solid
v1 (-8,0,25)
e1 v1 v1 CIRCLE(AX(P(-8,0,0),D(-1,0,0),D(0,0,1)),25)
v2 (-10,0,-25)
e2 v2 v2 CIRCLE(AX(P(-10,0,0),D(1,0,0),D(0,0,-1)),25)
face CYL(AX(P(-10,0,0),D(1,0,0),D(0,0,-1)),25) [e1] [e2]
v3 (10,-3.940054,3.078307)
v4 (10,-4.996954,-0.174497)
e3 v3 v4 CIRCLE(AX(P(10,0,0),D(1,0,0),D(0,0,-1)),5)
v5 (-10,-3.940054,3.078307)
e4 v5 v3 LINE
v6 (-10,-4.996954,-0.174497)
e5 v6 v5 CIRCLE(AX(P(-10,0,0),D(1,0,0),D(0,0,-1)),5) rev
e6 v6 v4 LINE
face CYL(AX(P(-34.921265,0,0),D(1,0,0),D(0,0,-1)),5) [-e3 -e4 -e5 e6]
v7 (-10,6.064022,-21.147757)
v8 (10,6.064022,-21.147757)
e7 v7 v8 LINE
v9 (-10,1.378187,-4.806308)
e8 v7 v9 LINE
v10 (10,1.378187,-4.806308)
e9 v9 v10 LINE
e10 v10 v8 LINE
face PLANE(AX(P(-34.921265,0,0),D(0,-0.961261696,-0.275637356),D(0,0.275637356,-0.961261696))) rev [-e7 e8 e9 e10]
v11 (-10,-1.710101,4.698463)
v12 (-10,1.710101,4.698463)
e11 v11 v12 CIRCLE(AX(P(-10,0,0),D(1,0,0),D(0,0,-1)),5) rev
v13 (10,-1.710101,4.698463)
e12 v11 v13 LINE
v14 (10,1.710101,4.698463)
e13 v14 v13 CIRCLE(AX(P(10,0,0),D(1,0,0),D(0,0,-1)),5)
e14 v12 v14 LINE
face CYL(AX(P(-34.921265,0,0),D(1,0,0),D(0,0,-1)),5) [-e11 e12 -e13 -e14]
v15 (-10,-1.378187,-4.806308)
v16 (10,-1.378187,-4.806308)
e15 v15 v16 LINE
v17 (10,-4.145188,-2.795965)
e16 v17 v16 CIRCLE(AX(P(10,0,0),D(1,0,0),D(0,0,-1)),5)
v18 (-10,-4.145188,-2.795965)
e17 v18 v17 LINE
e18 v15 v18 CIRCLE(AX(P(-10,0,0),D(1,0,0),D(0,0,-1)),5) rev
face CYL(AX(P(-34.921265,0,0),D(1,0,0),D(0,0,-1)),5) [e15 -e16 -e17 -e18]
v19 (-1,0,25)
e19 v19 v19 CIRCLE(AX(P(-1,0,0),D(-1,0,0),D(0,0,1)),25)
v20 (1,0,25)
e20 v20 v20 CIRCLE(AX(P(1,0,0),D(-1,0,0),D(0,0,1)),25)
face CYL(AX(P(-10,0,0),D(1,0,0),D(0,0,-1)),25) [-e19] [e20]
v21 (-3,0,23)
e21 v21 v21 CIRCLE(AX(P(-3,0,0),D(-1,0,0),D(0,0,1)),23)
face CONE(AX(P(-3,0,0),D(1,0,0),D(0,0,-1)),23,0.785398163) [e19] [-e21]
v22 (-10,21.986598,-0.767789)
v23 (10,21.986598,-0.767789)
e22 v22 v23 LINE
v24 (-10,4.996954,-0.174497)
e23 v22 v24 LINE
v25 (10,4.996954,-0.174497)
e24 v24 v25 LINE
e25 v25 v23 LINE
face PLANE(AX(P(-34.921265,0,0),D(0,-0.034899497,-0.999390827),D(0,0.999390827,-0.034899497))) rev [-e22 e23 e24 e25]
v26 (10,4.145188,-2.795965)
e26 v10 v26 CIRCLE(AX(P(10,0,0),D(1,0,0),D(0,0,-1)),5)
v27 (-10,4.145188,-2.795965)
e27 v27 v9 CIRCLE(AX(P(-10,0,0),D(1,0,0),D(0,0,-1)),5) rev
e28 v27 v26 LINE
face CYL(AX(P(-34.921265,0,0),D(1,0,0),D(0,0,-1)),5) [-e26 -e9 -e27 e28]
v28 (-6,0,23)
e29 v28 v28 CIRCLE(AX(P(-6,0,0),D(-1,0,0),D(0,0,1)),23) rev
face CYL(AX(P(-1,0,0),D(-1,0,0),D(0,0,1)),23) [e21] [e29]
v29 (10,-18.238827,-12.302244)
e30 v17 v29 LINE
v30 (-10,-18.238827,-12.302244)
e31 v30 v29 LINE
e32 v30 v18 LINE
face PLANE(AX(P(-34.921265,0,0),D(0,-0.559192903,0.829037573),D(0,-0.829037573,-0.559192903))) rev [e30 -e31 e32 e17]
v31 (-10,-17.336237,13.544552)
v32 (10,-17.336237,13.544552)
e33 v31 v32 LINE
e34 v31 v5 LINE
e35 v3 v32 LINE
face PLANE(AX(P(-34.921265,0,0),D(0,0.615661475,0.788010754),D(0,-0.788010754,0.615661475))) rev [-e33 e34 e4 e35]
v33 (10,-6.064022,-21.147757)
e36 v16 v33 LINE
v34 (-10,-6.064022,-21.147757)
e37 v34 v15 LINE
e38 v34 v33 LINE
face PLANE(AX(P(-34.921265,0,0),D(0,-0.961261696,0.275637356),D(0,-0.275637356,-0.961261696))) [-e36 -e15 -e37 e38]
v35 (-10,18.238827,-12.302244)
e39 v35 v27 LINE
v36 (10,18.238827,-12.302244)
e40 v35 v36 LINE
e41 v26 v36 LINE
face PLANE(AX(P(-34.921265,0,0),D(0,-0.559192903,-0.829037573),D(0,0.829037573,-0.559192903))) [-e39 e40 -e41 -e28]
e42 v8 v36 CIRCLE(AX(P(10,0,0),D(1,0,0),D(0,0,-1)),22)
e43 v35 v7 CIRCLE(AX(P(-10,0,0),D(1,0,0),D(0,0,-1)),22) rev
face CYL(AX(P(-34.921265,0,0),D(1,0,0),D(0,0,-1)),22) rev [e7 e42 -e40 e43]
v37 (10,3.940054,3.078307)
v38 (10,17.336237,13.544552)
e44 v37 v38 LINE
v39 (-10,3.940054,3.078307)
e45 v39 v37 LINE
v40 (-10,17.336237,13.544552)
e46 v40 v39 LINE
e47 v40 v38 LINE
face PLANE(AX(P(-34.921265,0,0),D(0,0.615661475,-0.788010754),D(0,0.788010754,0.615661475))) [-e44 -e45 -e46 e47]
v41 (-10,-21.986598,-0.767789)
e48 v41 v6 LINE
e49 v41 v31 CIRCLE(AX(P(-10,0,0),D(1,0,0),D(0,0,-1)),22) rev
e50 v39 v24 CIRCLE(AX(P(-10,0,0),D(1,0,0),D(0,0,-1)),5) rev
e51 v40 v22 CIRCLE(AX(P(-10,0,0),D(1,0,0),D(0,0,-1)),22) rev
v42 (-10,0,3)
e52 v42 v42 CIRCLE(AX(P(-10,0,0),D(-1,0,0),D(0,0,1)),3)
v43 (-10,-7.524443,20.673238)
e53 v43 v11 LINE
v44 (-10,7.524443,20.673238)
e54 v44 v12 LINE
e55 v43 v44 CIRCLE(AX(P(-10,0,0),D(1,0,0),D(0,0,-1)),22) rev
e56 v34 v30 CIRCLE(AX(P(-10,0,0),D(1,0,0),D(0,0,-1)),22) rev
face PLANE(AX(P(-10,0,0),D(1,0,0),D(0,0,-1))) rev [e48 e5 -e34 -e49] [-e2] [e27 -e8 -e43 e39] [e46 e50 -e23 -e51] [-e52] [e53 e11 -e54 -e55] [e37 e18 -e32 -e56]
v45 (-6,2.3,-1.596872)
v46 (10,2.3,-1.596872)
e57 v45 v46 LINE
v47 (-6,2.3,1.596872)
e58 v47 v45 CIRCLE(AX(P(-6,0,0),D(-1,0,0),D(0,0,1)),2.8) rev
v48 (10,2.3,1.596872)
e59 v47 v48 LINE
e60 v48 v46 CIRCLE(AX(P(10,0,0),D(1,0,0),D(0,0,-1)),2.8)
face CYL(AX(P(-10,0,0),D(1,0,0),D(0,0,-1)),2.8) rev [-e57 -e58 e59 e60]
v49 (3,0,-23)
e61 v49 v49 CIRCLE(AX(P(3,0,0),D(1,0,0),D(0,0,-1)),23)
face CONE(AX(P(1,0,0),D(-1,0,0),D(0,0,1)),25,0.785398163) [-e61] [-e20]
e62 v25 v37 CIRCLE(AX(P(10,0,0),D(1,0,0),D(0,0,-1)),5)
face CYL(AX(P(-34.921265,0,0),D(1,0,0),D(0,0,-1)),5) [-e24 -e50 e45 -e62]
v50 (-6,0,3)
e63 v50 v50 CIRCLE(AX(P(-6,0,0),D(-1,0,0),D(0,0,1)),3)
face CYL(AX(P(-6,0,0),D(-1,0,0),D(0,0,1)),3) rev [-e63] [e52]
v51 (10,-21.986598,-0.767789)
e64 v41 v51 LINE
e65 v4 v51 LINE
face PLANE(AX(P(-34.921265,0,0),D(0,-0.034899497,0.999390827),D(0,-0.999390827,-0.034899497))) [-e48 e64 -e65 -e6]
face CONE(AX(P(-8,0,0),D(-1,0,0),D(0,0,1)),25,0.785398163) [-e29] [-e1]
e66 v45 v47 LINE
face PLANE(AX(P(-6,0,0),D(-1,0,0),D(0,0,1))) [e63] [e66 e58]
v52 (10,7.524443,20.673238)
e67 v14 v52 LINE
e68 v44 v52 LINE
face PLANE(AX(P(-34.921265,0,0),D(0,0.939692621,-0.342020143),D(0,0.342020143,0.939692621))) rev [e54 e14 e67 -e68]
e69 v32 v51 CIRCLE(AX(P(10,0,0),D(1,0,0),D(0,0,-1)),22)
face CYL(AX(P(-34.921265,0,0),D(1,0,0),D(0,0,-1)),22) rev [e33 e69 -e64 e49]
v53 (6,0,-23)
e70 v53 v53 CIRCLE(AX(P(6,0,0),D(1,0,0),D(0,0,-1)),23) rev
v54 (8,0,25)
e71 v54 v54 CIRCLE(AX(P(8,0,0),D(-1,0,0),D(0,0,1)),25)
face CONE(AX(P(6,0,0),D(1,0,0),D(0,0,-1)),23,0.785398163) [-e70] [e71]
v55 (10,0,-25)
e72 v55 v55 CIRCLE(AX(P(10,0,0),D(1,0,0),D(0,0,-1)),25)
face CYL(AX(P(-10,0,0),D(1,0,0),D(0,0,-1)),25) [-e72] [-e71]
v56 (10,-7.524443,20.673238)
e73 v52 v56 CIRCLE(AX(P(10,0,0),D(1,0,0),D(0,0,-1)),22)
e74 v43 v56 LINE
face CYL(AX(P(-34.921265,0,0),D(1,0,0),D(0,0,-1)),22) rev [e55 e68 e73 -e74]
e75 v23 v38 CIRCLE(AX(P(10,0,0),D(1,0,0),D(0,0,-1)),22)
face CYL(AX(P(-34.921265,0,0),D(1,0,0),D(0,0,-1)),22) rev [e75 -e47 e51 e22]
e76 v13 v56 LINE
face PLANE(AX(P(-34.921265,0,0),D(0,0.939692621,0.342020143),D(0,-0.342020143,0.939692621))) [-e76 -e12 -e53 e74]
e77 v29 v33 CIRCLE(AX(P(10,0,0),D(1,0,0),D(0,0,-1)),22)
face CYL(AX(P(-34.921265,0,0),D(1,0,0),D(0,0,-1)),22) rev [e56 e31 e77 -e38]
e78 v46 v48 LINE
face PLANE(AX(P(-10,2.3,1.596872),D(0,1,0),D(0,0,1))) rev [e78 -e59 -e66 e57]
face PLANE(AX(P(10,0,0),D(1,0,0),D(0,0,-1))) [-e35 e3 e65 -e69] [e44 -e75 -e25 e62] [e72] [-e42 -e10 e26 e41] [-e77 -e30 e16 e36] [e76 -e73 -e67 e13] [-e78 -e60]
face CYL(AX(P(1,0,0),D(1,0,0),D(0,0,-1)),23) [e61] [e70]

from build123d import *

# Parameters (mm, degrees)
BASE_DEPTH          = 10
BASE_DEPTH_BACK     = 10
ESQUISSE1_R         = 25
ESQUISSE2_R         = 25
ESQUISSE2_R_2       = 23
VIDE_GORGE_DEPTH    = 7
VIDE_JANTE_DEPTH    = 20
ESQUISSE6_R         = 3
VIDE_BLOC_AXE_DEPTH = 4
CHAN_SIZE           = 2


with BuildPart() as part:
    # Esquisse1 → BASE (new, two sides: drawn at the far end of the back side and taken through both)
    with BuildSketch(Plane(origin=(0, 0, 0), x_dir=(0, 0, -1), z_dir=(1, 0, 0)).offset(-BASE_DEPTH_BACK)):
        Circle(ESQUISSE1_R)
        with BuildLine():
            Line((-1.596871942, 2.3), (1.596871942, 2.3))
            ThreePointArc((1.596871942, 2.3), (0, -2.8), (-1.596871942, 2.3))
        make_face(mode=Mode.SUBTRACT)
    extrude(amount=BASE_DEPTH + BASE_DEPTH_BACK)

    # Esquisse2 → VIDE GORGE (cut)
    with BuildSketch(Plane.ZY.offset(8)):
        with Locations(Location((0, 0, 0), (0, 0, 180))):
            Circle(ESQUISSE2_R)
        Circle(ESQUISSE2_R_2, mode=Mode.SUBTRACT)
    vide_gorge = extrude(amount=-VIDE_GORGE_DEPTH, mode=Mode.SUBTRACT)

    # SYM GORGE: VIDE GORGE across plane
    add(vide_gorge.mirror(Plane(origin=(0, 0, 0), x_dir=(0, 0, 1), z_dir=(1, 0, 0))), mode=Mode.SUBTRACT)

    # Esquisse4 → VIDE JANTE (cut)
    with BuildSketch(Plane(origin=(10, 0, 0), x_dir=(0, 0, -1), z_dir=(1, 0, 0))):
        with BuildLine():
            Line((-22, 0), (-5, 0))
            ThreePointArc((-5, 0), (-4.924038765, 0.868240888), (-4.698463104, 1.710100717))
            Line((-4.698463104, 1.710100717), (-20.673237657, 7.524443153))
            ThreePointArc((-20.673237657, 7.524443153), (-21.665770566, 3.820259909), (-22, 0))
        make_face()
        with BuildLine():
            ThreePointArc((-4.698463104, -1.710100717), (-4.924038765, -0.868240888), (-5, 0))
            Line((-5, 0), (-22, 0))
            ThreePointArc((-22, 0), (-21.665770566, -3.820259909), (-20.673237657, -7.524443153))
            Line((-20.673237657, -7.524443153), (-4.698463104, -1.710100717))
        make_face()
        with BuildLine():
            Line((-13.544552457, 17.336236579), (-3.078307377, 3.940053768))
            ThreePointArc((-3.078307377, 3.940053768), (-1.545084972, 4.755282581), (0.174497484, 4.996954135))
            Line((0.174497484, 4.996954135), (0.767788927, 21.986598194))
            ThreePointArc((0.767788927, 21.986598194), (-6.798373876, 20.923243358), (-13.544552457, 17.336236579))
        make_face()
        with BuildLine():
            Line((12.302243876, 18.238826596), (2.795964517, 4.145187863))
            ThreePointArc((2.795964517, 4.145187863), (4.045084972, 2.938926261), (4.80630848, 1.378186779))
            Line((4.80630848, 1.378186779), (21.147757311, 6.064021828))
            ThreePointArc((21.147757311, 6.064021828), (17.798373876, 12.93127555), (12.302243876, 18.238826596))
        make_face()
        with BuildLine():
            ThreePointArc((4.80630848, -1.378186779), (4.045084972, -2.938926261), (2.795964517, -4.145187863))
            Line((2.795964517, -4.145187863), (12.302243876, -18.238826596))
            ThreePointArc((12.302243876, -18.238826596), (17.798373876, -12.93127555), (21.147757311, -6.064021828))
            Line((21.147757311, -6.064021828), (4.80630848, -1.378186779))
        make_face()
        with BuildLine():
            ThreePointArc((0.174497484, -4.996954135), (-1.545084972, -4.755282581), (-3.078307377, -3.940053768))
            Line((-3.078307377, -3.940053768), (-13.544552457, -17.336236579))
            ThreePointArc((-13.544552457, -17.336236579), (-6.798373876, -20.923243358), (0.767788927, -21.986598194))
            Line((0.767788927, -21.986598194), (0.174497484, -4.996954135))
        make_face()
    extrude(amount=-VIDE_JANTE_DEPTH, mode=Mode.SUBTRACT)

    # Esquisse6 → VIDE BLOC AXE (cut)
    with BuildSketch(Plane.ZY.offset(10)):
        Circle(ESQUISSE6_R)
    extrude(amount=-VIDE_BLOC_AXE_DEPTH, mode=Mode.SUBTRACT)

    # CHAN
    chan_edges = [part.edges().sort_by_distance(p)[0] for p in [
        (-1, 0, -23),
        (-8, 0, -23),
        (8, 0, -23),
        (1, 0, -23),
    ]]
    chamfer(chan_edges, length=CHAN_SIZE - 0.0001)  # a hair under: the kernel refuses the full size


solid = part.part
